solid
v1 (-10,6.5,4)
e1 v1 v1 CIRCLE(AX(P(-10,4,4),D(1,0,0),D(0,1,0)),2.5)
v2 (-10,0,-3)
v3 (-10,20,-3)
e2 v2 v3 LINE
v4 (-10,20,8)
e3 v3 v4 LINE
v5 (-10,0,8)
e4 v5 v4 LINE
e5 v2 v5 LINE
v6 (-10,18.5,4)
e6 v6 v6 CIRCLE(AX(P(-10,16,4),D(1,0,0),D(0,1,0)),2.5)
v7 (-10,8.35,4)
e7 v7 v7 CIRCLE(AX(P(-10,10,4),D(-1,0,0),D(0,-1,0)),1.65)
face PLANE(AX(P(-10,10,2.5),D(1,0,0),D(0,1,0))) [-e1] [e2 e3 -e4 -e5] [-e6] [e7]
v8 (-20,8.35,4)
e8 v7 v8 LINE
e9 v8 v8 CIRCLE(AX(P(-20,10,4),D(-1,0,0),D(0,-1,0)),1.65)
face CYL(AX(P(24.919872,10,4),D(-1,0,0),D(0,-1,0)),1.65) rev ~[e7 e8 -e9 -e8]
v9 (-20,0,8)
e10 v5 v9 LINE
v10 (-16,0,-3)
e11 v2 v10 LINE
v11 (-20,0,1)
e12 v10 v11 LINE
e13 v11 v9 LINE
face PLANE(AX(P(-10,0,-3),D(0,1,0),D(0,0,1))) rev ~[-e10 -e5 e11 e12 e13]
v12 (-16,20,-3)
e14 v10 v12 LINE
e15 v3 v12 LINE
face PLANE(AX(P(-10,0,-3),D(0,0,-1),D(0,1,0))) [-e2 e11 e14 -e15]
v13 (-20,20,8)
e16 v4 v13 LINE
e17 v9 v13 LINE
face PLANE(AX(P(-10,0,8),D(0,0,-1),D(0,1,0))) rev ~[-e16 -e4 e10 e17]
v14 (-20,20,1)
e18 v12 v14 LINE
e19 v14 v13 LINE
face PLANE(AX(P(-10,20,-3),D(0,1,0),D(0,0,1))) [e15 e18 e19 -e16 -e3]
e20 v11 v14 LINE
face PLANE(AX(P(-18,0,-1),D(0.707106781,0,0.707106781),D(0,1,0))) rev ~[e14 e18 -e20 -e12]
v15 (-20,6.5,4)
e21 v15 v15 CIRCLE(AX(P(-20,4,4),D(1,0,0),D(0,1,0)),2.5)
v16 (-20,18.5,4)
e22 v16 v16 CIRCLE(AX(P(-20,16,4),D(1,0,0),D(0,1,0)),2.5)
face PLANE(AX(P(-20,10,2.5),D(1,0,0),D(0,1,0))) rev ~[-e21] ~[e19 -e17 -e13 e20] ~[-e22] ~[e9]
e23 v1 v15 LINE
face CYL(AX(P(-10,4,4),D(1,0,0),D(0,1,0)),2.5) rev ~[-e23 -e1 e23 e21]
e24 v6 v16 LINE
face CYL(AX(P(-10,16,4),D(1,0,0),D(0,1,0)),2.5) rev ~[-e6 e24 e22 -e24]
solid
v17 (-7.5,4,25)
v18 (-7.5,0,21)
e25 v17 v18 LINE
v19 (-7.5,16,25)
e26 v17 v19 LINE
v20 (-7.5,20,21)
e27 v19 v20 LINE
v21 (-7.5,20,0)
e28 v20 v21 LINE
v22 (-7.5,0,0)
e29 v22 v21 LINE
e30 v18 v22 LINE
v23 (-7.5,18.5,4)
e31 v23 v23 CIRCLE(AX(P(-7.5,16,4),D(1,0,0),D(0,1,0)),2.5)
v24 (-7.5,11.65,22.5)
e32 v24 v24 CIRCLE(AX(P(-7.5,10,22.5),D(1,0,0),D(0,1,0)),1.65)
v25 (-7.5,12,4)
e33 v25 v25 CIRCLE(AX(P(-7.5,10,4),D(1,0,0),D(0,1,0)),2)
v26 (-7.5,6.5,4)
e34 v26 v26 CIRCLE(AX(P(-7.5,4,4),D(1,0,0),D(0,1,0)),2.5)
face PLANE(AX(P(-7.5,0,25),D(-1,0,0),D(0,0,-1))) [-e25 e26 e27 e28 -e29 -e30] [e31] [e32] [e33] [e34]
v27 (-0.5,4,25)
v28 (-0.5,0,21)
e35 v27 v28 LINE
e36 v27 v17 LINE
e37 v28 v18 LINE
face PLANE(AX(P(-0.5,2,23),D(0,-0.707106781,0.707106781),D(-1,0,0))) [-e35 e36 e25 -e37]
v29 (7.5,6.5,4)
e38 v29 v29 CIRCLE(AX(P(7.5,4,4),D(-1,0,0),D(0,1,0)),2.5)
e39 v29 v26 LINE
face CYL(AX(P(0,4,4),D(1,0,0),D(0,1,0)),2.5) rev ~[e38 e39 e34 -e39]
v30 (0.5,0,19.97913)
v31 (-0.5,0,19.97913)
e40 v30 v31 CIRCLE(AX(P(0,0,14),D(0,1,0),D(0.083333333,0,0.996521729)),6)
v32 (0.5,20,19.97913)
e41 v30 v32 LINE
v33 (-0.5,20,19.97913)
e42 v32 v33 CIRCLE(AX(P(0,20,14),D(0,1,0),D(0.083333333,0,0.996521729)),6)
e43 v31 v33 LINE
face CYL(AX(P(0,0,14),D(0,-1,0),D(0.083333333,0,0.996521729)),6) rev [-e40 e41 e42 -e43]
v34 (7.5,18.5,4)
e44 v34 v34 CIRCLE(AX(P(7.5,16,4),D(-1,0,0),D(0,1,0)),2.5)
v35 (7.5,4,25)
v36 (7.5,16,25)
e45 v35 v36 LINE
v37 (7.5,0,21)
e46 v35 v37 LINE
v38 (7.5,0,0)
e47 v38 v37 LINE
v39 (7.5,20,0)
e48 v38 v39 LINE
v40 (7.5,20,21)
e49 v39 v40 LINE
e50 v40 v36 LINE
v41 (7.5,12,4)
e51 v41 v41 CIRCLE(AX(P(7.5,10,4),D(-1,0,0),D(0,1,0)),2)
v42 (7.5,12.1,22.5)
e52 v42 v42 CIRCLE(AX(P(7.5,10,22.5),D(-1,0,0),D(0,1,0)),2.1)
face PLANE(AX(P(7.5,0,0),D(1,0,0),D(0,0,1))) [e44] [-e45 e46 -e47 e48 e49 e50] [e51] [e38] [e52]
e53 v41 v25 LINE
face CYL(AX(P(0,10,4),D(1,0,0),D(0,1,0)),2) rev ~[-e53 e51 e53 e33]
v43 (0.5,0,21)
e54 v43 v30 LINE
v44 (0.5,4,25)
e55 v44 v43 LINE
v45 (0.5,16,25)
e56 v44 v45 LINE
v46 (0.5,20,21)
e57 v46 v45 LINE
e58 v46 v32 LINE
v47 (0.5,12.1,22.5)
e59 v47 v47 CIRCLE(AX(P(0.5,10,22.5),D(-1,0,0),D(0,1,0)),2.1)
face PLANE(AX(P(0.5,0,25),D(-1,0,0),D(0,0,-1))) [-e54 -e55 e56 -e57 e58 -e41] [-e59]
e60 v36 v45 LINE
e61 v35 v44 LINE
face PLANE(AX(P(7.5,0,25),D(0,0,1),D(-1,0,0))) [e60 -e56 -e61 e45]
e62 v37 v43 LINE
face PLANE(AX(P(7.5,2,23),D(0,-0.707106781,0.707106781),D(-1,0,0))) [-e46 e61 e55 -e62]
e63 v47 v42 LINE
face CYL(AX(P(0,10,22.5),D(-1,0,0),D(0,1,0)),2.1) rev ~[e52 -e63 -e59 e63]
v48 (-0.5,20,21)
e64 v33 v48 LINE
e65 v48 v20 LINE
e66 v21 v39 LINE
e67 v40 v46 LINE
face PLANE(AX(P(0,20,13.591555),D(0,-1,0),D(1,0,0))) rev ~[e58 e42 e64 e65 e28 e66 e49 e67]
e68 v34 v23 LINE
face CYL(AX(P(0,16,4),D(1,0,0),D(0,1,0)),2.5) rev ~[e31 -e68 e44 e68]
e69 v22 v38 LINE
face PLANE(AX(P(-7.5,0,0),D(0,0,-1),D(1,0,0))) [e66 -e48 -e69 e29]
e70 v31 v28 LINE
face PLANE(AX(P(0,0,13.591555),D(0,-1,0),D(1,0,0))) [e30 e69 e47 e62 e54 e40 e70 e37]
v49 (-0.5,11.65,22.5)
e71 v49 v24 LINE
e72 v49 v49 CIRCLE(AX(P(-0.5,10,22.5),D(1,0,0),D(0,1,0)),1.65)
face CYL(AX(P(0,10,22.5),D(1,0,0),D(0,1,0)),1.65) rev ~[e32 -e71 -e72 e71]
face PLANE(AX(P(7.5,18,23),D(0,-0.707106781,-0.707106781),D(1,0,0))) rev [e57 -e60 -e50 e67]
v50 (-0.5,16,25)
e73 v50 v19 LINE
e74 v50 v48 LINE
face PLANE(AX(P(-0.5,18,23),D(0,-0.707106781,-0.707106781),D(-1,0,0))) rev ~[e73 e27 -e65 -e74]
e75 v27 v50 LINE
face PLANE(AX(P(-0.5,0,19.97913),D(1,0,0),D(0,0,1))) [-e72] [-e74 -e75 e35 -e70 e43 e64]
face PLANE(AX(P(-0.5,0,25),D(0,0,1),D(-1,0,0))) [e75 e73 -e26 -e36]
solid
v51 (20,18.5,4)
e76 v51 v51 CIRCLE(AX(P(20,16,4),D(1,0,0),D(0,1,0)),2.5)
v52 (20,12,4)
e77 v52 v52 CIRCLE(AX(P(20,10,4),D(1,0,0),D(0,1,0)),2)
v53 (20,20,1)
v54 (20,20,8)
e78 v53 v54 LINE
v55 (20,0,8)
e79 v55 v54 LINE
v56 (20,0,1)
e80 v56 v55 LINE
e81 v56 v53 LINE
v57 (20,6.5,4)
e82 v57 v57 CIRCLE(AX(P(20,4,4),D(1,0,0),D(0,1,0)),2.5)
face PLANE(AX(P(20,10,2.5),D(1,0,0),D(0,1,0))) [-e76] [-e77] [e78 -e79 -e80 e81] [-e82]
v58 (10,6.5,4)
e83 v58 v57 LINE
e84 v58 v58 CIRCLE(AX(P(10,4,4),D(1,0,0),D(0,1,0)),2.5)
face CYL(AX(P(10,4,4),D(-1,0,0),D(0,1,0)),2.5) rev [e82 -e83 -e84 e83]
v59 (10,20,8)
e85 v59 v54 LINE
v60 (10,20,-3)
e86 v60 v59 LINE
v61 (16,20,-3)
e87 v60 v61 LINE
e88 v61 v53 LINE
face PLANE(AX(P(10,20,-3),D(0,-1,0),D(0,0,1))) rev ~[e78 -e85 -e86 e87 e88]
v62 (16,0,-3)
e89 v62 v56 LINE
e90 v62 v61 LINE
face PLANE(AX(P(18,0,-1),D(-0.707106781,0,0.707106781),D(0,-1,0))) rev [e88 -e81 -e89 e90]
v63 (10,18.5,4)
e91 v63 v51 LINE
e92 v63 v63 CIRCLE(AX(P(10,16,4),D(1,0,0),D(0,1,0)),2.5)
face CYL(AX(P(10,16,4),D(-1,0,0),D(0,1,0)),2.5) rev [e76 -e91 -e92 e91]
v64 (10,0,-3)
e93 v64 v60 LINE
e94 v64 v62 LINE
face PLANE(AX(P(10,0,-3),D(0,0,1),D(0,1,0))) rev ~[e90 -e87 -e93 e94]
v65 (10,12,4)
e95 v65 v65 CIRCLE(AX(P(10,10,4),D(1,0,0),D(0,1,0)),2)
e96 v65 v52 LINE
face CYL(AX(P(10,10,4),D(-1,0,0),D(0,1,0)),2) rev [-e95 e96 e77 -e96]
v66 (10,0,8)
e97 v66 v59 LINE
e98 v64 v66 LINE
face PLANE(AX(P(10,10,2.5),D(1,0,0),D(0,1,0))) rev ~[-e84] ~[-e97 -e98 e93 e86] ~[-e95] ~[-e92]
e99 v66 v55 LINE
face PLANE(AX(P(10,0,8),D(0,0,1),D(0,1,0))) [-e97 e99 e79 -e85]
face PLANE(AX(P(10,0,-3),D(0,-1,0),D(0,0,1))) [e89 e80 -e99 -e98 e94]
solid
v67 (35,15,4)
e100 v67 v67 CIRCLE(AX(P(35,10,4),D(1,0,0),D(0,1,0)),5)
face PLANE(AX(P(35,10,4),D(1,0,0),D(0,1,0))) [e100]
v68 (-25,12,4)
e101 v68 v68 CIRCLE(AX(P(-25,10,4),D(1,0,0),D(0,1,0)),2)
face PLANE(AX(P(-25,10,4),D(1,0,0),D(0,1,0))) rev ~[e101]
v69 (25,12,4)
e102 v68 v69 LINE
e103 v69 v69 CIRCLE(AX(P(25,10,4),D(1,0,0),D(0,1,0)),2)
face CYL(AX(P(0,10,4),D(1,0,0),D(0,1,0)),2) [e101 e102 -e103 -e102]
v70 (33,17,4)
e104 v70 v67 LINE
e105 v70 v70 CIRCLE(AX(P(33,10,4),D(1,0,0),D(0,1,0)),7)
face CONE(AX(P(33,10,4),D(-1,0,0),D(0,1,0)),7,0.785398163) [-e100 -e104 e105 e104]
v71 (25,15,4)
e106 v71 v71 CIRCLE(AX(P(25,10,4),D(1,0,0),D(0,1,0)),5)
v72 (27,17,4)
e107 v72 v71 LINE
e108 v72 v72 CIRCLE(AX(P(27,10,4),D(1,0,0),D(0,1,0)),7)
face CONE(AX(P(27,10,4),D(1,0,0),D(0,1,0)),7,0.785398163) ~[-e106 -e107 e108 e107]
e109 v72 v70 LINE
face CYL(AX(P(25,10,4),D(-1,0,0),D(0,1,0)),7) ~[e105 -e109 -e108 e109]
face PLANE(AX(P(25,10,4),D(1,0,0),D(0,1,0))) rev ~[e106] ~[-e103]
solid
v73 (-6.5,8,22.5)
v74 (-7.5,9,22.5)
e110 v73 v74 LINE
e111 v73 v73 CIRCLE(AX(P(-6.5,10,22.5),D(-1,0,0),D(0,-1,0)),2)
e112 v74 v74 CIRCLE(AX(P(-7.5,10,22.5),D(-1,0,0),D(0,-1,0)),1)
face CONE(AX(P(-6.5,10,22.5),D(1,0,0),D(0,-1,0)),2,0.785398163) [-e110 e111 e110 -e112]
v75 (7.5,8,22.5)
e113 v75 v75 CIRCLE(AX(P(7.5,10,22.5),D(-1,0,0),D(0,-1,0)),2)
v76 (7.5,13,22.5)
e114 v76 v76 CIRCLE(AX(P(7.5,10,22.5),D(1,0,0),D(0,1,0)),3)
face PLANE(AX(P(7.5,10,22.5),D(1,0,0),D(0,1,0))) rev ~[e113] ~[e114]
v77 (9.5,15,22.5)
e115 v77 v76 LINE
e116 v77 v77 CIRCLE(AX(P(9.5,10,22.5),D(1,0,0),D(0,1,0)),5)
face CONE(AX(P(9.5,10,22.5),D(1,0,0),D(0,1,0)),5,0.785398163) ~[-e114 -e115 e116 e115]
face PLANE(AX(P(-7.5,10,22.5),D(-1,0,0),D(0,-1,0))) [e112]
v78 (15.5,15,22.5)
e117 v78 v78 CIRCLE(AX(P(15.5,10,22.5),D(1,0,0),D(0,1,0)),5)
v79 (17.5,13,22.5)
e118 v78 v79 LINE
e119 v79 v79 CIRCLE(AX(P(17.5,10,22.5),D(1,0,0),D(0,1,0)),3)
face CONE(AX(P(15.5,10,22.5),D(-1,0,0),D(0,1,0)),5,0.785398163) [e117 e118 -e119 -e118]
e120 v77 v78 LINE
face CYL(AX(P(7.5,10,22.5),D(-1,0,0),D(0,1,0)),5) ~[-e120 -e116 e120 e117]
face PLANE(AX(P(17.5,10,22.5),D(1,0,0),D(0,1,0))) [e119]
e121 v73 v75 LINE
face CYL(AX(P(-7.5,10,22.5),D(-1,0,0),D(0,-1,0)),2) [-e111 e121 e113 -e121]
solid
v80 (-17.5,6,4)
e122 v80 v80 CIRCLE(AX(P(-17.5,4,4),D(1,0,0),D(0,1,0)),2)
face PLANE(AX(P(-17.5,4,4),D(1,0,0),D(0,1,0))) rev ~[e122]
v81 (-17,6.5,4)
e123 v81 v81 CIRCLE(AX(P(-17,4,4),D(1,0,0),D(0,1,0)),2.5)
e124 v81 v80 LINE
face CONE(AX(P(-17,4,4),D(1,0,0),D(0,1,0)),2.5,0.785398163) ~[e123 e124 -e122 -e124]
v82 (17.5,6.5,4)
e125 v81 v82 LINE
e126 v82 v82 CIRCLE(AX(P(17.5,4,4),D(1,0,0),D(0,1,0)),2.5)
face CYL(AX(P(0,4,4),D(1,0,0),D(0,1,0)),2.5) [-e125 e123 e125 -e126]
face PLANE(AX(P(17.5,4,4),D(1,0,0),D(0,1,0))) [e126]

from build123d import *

# Parameters (mm, degrees)
F1_DEPTH      = 20
F2_R          = 2.5
F2_R_2        = 2
F3_DEPTH      = 7.501
F3_DEPTH_BACK = 7.501
F4_DEPTH      = 17.5
F5_START      = 10
F2_W          = 20
F2_H          = 11
F5_DEPTH      = 10
F6_START      = -10
F6_DEPTH      = 10
F7_D          = 3.3
F8_SIZE       = 4
F8_2_SIZE     = 4
F9_SIZE       = 4
F10_DEPTH     = 25
F11_R         = 7
F12_DEPTH     = 10
F14_D         = 3.3
F14_DEPTH     = 7.501
F15_D         = 4.2
F15_DEPTH     = 7.501
F16_SIZE      = 0.5
F17_R         = 2
F18_DEPTH     = 15
F19_R         = 5
F20_DEPTH     = 10
F21_SIZE      = 2
F21_2_SIZE    = 2
F22_SIZE      = 1


with BuildPart() as f1:
    # F0 (on Front) → F1 (new body)
    with BuildSketch(Plane.XZ):
        with BuildLine():
            Line((-0.5, 25), (-7.5, 25))
            Line((-7.5, 25), (-7.5, 0))
            Line((-7.5, 0), (7.5, 0))
            Line((7.5, 0), (7.5, 25))
            Line((7.5, 25), (0.5, 25))
            Line((0.5, 25), (0.5, 19.9791303716))
            ThreePointArc((0.5, 19.9791303716), (0, 8), (-0.5, 19.9791303716))
            Line((-0.5, 19.9791303716), (-0.5, 25))
        make_face()
    extrude(amount=-F1_DEPTH)

    # F2 (on Right) → F3 (cut, two sides)
    with BuildSketch(Plane.YZ) as f3_sk:
        with Locations((4, 4)):
            Circle(F2_R)
        with Locations((10, 4)):
            Circle(F2_R_2)
        with Locations((16, 4)):
            Circle(F2_R)
    extrude(amount=F3_DEPTH, mode=Mode.SUBTRACT)
    extrude(f3_sk.sketch, amount=-F3_DEPTH_BACK, mode=Mode.SUBTRACT)

    # F9
    f9_edges = [f1.edges().sort_by_distance(p)[0] for p in [
        (4, 0, 25),
        (-4, 0, 25),
        (-4, 20, 25),
        (4, 20, 25),
    ]]
    chamfer(f9_edges, length=F9_SIZE)

    # F14 (through all, one way)
    with BuildSketch(Plane.YZ):
        with Locations((10, 22.5)):
            Circle(F14_D / 2)
    extrude(amount=-F14_DEPTH, mode=Mode.SUBTRACT)

    # F15 (through all, one way)
    with BuildSketch(Plane(origin=(0, 0, 0), x_dir=(0, 1, 0), z_dir=(-1, 0, 0))):
        with Locations((10, -22.5)):
            Circle(F15_D / 2)
    extrude(amount=-F15_DEPTH, mode=Mode.SUBTRACT)


with BuildPart() as f4:
    # F2 (on Right) → F4 (new body, symmetric)
    with BuildSketch(Plane.YZ):
        with Locations((4, 4)):
            Circle(F2_R)
    extrude(amount=F4_DEPTH, both=True)

    # F16
    f16_edges = [f4.edges().sort_by_distance(p)[0] for p in [
        (-17.5, 1.5, 4),
    ]]
    chamfer(f16_edges, length=F16_SIZE)


with BuildPart() as f5:
    # F2 (on Right) → F5 (new body)
    with BuildSketch(Plane.YZ.offset(F5_START)):
        with Locations((10, 2.5)):
            Rectangle(F2_W, F2_H)
        with Locations((4, 4)):
            Circle(F2_R, mode=Mode.SUBTRACT)
        with Locations((10, 4)):
            Circle(F2_R_2, mode=Mode.SUBTRACT)
        with Locations((16, 4)):
            Circle(F2_R, mode=Mode.SUBTRACT)
    extrude(amount=F5_DEPTH)

    # F8
    f8_edges = [f5.edges().sort_by_distance(p)[0] for p in [
        (20, 10, -3),
    ]]
    chamfer(f8_edges, length=F8_SIZE)


with BuildPart() as f6:
    # F2 (on Right) → F6 (new body)
    with BuildSketch(Plane.YZ.offset(F6_START)):
        with Locations((10, 2.5)):
            Rectangle(F2_W, F2_H)
        with Locations((4, 4)):
            Circle(F2_R, mode=Mode.SUBTRACT)
        with Locations((10, 4)):
            Circle(F2_R_2, mode=Mode.SUBTRACT)
        with Locations((16, 4)):
            Circle(F2_R, mode=Mode.SUBTRACT)
        with Locations((10, 4)):
            Circle(F2_R_2)
    extrude(amount=-F6_DEPTH)

    # F7 (through all)
    with Locations(Plane.YZ):
        with Locations((10, 4)):
            Hole(F7_D / 2)

    # F8#2
    f8_2_edges = [f6.edges().sort_by_distance(p)[0] for p in [
        (-20, 10, -3),
    ]]
    chamfer(f8_2_edges, length=F8_2_SIZE)


with BuildPart() as f10:
    # F2 (on Right) → F10 (new body, symmetric)
    with BuildSketch(Plane.YZ):
        with Locations((10, 4)):
            Circle(F2_R_2)
    extrude(amount=F10_DEPTH, both=True)

    # F11 (on face) → F12 (join)
    with BuildSketch(Plane.YZ.offset(25)):
        with Locations((10, 4)):
            Circle(F11_R)
    extrude(amount=F12_DEPTH)

    # F21
    f21_edges = [f10.edges().sort_by_distance(p)[0] for p in [
        (30, 17, 4),
        (25, 3, 4),
        (35, 3, 4),
    ]]
    chamfer(f21_edges, length=F21_SIZE)


with BuildPart() as f18:
    # F17 (on face) → F18 (new body, through all)
    with BuildSketch(Plane(origin=(-7.5, 0, 0), x_dir=(0, -1, 0), z_dir=(-1, 0, 0))):
        with Locations((-10, 22.5)):
            Circle(F17_R)
    extrude(amount=-F18_DEPTH)

    # F19 (on face) → F20 (join)
    with BuildSketch(Plane.YZ.offset(7.5)):
        with Locations((10, 22.5)):
            Circle(F19_R)
    extrude(amount=F20_DEPTH)

    # F21#2
    f21_2_edges = [f18.edges().sort_by_distance(p)[0] for p in [
        (12.5, 15, 22.5),
        (7.5, 5, 22.5),
        (17.5, 5, 22.5),
    ]]
    chamfer(f21_2_edges, length=F21_2_SIZE)

    # F22
    f22_edges = [f18.edges().sort_by_distance(p)[0] for p in [
        (-7.5, 12, 22.5),
    ]]
    chamfer(f22_edges, length=F22_SIZE)


solid = Compound([f1.part, f4.part, f5.part, f6.part, f10.part, f18.part])
